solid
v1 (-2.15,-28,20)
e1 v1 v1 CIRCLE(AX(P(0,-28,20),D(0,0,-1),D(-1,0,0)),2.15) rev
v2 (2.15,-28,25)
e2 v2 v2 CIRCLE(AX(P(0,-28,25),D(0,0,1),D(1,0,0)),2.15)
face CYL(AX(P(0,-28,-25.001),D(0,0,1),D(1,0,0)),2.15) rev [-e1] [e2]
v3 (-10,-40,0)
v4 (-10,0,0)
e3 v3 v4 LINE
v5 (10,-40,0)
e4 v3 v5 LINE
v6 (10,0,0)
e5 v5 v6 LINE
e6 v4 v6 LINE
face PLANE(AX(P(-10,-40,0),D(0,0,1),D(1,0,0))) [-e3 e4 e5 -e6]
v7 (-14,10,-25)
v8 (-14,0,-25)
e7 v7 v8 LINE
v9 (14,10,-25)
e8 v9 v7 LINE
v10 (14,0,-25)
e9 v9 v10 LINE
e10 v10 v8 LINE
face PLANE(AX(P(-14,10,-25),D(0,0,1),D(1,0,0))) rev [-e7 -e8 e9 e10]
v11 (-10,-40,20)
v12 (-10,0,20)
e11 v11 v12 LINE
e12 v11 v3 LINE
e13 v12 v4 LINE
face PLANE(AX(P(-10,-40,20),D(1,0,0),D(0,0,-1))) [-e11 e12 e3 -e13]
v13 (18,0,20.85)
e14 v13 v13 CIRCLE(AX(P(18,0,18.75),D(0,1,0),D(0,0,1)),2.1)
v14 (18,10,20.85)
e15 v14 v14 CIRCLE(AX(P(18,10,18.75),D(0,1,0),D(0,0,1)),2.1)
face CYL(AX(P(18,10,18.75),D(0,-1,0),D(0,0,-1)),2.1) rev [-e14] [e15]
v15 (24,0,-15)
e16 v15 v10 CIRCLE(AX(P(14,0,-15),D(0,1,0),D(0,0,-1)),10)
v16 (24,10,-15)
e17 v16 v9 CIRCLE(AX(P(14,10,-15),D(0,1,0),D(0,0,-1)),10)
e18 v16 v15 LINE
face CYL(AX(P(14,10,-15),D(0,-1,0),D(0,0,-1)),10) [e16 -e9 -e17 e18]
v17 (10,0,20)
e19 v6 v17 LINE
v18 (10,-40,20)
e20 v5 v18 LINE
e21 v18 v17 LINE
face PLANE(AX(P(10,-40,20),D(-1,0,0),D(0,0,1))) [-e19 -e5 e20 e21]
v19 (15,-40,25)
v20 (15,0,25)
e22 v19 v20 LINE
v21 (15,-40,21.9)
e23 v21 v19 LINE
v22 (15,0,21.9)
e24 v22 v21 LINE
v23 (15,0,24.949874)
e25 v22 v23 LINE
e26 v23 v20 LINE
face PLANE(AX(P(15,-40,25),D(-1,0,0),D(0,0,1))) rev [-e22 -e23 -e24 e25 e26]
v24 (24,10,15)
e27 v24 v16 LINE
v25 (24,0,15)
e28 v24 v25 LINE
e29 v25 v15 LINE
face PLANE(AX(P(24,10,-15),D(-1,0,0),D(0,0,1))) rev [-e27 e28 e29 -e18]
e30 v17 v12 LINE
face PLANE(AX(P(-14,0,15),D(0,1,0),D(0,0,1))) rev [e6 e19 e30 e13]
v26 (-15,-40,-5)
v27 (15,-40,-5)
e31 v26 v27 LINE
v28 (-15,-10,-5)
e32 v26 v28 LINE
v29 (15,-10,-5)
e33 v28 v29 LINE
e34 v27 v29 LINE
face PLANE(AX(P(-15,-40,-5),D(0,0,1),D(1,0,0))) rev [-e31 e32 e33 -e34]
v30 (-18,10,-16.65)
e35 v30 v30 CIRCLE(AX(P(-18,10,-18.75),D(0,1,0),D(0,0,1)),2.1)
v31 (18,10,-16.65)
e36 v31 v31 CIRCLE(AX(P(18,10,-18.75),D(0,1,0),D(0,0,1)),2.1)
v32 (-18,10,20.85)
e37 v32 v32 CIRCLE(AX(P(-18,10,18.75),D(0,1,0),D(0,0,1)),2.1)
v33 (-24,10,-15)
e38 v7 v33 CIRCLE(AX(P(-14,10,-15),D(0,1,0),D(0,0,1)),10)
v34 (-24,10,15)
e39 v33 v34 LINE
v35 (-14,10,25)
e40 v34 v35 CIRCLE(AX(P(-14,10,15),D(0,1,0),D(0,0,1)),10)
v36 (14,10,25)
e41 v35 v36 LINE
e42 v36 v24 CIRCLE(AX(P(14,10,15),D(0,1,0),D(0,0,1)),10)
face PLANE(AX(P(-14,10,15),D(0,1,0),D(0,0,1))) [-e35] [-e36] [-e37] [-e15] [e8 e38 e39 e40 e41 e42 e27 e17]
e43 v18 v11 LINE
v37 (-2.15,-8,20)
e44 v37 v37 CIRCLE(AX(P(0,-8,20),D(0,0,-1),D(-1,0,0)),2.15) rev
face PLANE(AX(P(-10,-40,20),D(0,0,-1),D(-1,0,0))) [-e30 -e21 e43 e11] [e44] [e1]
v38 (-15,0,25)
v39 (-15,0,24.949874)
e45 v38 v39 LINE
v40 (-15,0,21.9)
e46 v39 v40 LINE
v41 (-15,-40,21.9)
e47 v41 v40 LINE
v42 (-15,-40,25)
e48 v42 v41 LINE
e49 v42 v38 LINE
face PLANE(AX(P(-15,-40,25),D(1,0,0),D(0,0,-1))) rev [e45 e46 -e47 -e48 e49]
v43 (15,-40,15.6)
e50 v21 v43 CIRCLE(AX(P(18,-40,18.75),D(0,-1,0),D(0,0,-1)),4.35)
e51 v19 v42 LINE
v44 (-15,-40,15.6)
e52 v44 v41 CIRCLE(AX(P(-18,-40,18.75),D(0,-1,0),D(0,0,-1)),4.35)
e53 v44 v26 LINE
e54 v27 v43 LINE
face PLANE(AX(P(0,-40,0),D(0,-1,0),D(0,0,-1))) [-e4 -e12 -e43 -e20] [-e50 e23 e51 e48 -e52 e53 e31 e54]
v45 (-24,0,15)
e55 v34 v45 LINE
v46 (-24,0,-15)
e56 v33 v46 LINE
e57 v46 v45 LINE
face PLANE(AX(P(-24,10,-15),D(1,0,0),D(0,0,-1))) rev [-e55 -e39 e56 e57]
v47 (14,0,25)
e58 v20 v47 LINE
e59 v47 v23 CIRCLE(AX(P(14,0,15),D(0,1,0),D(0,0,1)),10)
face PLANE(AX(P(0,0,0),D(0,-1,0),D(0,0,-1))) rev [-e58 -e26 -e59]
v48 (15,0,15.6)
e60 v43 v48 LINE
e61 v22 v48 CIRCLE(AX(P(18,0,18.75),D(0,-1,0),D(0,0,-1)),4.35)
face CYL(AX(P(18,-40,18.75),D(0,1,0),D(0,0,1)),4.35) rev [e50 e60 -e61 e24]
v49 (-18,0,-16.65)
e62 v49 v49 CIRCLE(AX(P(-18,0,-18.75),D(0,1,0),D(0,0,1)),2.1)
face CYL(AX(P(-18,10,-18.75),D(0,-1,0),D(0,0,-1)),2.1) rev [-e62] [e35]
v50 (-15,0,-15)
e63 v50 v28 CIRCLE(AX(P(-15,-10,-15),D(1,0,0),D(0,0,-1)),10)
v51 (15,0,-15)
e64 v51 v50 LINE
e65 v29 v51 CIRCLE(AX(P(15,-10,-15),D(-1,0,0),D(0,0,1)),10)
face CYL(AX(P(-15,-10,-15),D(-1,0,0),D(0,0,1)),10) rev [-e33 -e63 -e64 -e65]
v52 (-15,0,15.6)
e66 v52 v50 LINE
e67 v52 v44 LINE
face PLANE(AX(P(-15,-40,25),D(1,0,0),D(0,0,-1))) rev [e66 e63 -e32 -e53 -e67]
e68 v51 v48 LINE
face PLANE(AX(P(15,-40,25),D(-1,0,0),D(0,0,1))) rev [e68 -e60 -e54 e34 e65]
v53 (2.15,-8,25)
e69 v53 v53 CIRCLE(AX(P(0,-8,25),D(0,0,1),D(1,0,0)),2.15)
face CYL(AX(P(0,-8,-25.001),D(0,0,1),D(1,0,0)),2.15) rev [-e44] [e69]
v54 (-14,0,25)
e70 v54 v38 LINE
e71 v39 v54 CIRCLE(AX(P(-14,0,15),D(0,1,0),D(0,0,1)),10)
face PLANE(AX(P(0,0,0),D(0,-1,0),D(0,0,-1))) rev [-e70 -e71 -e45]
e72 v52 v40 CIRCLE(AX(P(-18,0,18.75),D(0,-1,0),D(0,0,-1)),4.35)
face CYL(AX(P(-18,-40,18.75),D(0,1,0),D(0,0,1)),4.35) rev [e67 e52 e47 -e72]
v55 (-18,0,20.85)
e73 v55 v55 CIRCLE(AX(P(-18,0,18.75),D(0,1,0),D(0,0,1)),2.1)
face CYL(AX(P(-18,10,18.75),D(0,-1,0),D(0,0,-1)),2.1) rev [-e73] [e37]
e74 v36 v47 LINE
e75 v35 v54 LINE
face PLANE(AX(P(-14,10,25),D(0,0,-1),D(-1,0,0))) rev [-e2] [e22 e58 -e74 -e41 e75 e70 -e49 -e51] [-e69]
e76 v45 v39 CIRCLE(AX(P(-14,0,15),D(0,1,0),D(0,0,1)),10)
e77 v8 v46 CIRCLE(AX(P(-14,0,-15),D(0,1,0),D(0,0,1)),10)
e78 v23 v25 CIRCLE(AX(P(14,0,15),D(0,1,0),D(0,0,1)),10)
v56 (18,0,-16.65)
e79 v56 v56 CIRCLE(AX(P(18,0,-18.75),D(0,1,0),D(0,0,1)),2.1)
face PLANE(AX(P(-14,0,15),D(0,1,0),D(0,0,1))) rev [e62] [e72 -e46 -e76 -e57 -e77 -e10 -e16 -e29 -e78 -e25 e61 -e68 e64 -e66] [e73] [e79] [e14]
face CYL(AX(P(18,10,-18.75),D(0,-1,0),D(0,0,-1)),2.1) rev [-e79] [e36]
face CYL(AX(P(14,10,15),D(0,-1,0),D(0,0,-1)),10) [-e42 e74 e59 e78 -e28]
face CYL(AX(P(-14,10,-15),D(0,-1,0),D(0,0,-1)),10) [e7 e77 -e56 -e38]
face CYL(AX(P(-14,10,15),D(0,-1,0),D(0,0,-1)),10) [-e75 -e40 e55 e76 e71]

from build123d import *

# Parameters (mm, degrees)
SKETCH1_R           = 2.1
BOSS_EXTRUDE1_DEPTH = 10
SKETCH6_W           = 30
SKETCH6_H           = 30
SKETCH6_W_2         = 20
SKETCH6_H_2         = 20
BOSS_EXTRUDE5_DEPTH = 40
SKETCH7_R           = 4.35
CUT_EXTRUDE1_DEPTH  = 53.92447449
CUT_EXTRUDE2_REACH  = 70.381
SKETCH8_R           = 2.15
FILLET2_R           = 10


# Read off the part's stored shape, not the designer's step: moBlkMgr[demtay]
with BuildPart() as part:
    # Sketch1 → Boss-Extrude1 (new body)
    with BuildSketch(Plane(origin=(0, 0, 0), x_dir=(1, 0, 0), z_dir=(0, 1, 0))):
        with BuildLine():
            Line((-14, 25), (14, 25))
            ThreePointArc((14, 25), (21.071067812, 22.071067812), (24, 15))
            Line((24, 15), (24, -15))
            ThreePointArc((24, -15), (21.071067812, -22.071067812), (14, -25))
            Line((14, -25), (-14, -25))
            ThreePointArc((-14, -25), (-21.071067812, -22.071067812), (-24, -15))
            Line((-24, -15), (-24, 15))
            ThreePointArc((-24, 15), (-21.071067812, 22.071067812), (-14, 25))
        make_face()
        with Locations(Location((-18, 18.75, 0), (0, 0, 270))):
            Circle(SKETCH1_R, mode=Mode.SUBTRACT)
        with Locations(Location((18, 18.75, 0), (0, 0, 270))):
            Circle(SKETCH1_R, mode=Mode.SUBTRACT)
        with Locations(Location((18, -18.75, 0), (0, 0, 270))):
            Circle(SKETCH1_R, mode=Mode.SUBTRACT)
        with Locations(Location((-18, -18.75, 0), (0, 0, 270))):
            Circle(SKETCH1_R, mode=Mode.SUBTRACT)
    extrude(amount=BOSS_EXTRUDE1_DEPTH)

    # Sketch6 → Boss-Extrude5 (add)
    with BuildSketch(Plane(origin=(0, 0, 0), x_dir=(-1, 0, 0), z_dir=(0, -1, 0))):
        with Locations((0, -10)):
            Rectangle(SKETCH6_W, SKETCH6_H)
        with Locations((0, -10)):
            Rectangle(SKETCH6_W_2, SKETCH6_H_2, mode=Mode.SUBTRACT)
    extrude(amount=BOSS_EXTRUDE5_DEPTH)

    # Sketch7 → Cut-Extrude1 (cut, through all)
    with BuildSketch(Plane(origin=(0, 0, 0), x_dir=(-1, 0, 0), z_dir=(0, -1, 0))):
        with Locations((-18, -18.75)):
            Circle(SKETCH7_R)
        with Locations((18, -18.75)):
            Circle(SKETCH7_R)
    extrude(amount=CUT_EXTRUDE1_DEPTH, mode=Mode.SUBTRACT)

    # Sketch8 → Cut-Extrude2 (cut, up to next)
    with BuildSketch(Plane.XY.offset(25), mode=Mode.PRIVATE) as cut_extrude2_sk1:
        with Locations((0, -8)):
            Circle(SKETCH8_R)
    cut_extrude2_tool1 = extrude(cut_extrude2_sk1.sketch, amount=-CUT_EXTRUDE2_REACH, mode=Mode.PRIVATE) & part.part
    # Sketch8 → Cut-Extrude2 (cut, up to next)
    with BuildSketch(Plane.XY.offset(25), mode=Mode.PRIVATE) as cut_extrude2_sk2:
        with Locations((0, -28)):
            Circle(SKETCH8_R)
    cut_extrude2_tool2 = extrude(cut_extrude2_sk2.sketch, amount=-CUT_EXTRUDE2_REACH, mode=Mode.PRIVATE) & part.part
    add(cut_extrude2_tool1.solids().sort_by_distance((0, -8, 25))[0], mode=Mode.SUBTRACT)
    add(cut_extrude2_tool2.solids().sort_by_distance((0, -28, 25))[0], mode=Mode.SUBTRACT)

    # Fillet2
    fillet2_edges = [part.edges().sort_by_distance(p)[0] for p in [
        (0, 0, -5),
    ]]
    fillet(fillet2_edges, radius=FILLET2_R)


solid = part.part
